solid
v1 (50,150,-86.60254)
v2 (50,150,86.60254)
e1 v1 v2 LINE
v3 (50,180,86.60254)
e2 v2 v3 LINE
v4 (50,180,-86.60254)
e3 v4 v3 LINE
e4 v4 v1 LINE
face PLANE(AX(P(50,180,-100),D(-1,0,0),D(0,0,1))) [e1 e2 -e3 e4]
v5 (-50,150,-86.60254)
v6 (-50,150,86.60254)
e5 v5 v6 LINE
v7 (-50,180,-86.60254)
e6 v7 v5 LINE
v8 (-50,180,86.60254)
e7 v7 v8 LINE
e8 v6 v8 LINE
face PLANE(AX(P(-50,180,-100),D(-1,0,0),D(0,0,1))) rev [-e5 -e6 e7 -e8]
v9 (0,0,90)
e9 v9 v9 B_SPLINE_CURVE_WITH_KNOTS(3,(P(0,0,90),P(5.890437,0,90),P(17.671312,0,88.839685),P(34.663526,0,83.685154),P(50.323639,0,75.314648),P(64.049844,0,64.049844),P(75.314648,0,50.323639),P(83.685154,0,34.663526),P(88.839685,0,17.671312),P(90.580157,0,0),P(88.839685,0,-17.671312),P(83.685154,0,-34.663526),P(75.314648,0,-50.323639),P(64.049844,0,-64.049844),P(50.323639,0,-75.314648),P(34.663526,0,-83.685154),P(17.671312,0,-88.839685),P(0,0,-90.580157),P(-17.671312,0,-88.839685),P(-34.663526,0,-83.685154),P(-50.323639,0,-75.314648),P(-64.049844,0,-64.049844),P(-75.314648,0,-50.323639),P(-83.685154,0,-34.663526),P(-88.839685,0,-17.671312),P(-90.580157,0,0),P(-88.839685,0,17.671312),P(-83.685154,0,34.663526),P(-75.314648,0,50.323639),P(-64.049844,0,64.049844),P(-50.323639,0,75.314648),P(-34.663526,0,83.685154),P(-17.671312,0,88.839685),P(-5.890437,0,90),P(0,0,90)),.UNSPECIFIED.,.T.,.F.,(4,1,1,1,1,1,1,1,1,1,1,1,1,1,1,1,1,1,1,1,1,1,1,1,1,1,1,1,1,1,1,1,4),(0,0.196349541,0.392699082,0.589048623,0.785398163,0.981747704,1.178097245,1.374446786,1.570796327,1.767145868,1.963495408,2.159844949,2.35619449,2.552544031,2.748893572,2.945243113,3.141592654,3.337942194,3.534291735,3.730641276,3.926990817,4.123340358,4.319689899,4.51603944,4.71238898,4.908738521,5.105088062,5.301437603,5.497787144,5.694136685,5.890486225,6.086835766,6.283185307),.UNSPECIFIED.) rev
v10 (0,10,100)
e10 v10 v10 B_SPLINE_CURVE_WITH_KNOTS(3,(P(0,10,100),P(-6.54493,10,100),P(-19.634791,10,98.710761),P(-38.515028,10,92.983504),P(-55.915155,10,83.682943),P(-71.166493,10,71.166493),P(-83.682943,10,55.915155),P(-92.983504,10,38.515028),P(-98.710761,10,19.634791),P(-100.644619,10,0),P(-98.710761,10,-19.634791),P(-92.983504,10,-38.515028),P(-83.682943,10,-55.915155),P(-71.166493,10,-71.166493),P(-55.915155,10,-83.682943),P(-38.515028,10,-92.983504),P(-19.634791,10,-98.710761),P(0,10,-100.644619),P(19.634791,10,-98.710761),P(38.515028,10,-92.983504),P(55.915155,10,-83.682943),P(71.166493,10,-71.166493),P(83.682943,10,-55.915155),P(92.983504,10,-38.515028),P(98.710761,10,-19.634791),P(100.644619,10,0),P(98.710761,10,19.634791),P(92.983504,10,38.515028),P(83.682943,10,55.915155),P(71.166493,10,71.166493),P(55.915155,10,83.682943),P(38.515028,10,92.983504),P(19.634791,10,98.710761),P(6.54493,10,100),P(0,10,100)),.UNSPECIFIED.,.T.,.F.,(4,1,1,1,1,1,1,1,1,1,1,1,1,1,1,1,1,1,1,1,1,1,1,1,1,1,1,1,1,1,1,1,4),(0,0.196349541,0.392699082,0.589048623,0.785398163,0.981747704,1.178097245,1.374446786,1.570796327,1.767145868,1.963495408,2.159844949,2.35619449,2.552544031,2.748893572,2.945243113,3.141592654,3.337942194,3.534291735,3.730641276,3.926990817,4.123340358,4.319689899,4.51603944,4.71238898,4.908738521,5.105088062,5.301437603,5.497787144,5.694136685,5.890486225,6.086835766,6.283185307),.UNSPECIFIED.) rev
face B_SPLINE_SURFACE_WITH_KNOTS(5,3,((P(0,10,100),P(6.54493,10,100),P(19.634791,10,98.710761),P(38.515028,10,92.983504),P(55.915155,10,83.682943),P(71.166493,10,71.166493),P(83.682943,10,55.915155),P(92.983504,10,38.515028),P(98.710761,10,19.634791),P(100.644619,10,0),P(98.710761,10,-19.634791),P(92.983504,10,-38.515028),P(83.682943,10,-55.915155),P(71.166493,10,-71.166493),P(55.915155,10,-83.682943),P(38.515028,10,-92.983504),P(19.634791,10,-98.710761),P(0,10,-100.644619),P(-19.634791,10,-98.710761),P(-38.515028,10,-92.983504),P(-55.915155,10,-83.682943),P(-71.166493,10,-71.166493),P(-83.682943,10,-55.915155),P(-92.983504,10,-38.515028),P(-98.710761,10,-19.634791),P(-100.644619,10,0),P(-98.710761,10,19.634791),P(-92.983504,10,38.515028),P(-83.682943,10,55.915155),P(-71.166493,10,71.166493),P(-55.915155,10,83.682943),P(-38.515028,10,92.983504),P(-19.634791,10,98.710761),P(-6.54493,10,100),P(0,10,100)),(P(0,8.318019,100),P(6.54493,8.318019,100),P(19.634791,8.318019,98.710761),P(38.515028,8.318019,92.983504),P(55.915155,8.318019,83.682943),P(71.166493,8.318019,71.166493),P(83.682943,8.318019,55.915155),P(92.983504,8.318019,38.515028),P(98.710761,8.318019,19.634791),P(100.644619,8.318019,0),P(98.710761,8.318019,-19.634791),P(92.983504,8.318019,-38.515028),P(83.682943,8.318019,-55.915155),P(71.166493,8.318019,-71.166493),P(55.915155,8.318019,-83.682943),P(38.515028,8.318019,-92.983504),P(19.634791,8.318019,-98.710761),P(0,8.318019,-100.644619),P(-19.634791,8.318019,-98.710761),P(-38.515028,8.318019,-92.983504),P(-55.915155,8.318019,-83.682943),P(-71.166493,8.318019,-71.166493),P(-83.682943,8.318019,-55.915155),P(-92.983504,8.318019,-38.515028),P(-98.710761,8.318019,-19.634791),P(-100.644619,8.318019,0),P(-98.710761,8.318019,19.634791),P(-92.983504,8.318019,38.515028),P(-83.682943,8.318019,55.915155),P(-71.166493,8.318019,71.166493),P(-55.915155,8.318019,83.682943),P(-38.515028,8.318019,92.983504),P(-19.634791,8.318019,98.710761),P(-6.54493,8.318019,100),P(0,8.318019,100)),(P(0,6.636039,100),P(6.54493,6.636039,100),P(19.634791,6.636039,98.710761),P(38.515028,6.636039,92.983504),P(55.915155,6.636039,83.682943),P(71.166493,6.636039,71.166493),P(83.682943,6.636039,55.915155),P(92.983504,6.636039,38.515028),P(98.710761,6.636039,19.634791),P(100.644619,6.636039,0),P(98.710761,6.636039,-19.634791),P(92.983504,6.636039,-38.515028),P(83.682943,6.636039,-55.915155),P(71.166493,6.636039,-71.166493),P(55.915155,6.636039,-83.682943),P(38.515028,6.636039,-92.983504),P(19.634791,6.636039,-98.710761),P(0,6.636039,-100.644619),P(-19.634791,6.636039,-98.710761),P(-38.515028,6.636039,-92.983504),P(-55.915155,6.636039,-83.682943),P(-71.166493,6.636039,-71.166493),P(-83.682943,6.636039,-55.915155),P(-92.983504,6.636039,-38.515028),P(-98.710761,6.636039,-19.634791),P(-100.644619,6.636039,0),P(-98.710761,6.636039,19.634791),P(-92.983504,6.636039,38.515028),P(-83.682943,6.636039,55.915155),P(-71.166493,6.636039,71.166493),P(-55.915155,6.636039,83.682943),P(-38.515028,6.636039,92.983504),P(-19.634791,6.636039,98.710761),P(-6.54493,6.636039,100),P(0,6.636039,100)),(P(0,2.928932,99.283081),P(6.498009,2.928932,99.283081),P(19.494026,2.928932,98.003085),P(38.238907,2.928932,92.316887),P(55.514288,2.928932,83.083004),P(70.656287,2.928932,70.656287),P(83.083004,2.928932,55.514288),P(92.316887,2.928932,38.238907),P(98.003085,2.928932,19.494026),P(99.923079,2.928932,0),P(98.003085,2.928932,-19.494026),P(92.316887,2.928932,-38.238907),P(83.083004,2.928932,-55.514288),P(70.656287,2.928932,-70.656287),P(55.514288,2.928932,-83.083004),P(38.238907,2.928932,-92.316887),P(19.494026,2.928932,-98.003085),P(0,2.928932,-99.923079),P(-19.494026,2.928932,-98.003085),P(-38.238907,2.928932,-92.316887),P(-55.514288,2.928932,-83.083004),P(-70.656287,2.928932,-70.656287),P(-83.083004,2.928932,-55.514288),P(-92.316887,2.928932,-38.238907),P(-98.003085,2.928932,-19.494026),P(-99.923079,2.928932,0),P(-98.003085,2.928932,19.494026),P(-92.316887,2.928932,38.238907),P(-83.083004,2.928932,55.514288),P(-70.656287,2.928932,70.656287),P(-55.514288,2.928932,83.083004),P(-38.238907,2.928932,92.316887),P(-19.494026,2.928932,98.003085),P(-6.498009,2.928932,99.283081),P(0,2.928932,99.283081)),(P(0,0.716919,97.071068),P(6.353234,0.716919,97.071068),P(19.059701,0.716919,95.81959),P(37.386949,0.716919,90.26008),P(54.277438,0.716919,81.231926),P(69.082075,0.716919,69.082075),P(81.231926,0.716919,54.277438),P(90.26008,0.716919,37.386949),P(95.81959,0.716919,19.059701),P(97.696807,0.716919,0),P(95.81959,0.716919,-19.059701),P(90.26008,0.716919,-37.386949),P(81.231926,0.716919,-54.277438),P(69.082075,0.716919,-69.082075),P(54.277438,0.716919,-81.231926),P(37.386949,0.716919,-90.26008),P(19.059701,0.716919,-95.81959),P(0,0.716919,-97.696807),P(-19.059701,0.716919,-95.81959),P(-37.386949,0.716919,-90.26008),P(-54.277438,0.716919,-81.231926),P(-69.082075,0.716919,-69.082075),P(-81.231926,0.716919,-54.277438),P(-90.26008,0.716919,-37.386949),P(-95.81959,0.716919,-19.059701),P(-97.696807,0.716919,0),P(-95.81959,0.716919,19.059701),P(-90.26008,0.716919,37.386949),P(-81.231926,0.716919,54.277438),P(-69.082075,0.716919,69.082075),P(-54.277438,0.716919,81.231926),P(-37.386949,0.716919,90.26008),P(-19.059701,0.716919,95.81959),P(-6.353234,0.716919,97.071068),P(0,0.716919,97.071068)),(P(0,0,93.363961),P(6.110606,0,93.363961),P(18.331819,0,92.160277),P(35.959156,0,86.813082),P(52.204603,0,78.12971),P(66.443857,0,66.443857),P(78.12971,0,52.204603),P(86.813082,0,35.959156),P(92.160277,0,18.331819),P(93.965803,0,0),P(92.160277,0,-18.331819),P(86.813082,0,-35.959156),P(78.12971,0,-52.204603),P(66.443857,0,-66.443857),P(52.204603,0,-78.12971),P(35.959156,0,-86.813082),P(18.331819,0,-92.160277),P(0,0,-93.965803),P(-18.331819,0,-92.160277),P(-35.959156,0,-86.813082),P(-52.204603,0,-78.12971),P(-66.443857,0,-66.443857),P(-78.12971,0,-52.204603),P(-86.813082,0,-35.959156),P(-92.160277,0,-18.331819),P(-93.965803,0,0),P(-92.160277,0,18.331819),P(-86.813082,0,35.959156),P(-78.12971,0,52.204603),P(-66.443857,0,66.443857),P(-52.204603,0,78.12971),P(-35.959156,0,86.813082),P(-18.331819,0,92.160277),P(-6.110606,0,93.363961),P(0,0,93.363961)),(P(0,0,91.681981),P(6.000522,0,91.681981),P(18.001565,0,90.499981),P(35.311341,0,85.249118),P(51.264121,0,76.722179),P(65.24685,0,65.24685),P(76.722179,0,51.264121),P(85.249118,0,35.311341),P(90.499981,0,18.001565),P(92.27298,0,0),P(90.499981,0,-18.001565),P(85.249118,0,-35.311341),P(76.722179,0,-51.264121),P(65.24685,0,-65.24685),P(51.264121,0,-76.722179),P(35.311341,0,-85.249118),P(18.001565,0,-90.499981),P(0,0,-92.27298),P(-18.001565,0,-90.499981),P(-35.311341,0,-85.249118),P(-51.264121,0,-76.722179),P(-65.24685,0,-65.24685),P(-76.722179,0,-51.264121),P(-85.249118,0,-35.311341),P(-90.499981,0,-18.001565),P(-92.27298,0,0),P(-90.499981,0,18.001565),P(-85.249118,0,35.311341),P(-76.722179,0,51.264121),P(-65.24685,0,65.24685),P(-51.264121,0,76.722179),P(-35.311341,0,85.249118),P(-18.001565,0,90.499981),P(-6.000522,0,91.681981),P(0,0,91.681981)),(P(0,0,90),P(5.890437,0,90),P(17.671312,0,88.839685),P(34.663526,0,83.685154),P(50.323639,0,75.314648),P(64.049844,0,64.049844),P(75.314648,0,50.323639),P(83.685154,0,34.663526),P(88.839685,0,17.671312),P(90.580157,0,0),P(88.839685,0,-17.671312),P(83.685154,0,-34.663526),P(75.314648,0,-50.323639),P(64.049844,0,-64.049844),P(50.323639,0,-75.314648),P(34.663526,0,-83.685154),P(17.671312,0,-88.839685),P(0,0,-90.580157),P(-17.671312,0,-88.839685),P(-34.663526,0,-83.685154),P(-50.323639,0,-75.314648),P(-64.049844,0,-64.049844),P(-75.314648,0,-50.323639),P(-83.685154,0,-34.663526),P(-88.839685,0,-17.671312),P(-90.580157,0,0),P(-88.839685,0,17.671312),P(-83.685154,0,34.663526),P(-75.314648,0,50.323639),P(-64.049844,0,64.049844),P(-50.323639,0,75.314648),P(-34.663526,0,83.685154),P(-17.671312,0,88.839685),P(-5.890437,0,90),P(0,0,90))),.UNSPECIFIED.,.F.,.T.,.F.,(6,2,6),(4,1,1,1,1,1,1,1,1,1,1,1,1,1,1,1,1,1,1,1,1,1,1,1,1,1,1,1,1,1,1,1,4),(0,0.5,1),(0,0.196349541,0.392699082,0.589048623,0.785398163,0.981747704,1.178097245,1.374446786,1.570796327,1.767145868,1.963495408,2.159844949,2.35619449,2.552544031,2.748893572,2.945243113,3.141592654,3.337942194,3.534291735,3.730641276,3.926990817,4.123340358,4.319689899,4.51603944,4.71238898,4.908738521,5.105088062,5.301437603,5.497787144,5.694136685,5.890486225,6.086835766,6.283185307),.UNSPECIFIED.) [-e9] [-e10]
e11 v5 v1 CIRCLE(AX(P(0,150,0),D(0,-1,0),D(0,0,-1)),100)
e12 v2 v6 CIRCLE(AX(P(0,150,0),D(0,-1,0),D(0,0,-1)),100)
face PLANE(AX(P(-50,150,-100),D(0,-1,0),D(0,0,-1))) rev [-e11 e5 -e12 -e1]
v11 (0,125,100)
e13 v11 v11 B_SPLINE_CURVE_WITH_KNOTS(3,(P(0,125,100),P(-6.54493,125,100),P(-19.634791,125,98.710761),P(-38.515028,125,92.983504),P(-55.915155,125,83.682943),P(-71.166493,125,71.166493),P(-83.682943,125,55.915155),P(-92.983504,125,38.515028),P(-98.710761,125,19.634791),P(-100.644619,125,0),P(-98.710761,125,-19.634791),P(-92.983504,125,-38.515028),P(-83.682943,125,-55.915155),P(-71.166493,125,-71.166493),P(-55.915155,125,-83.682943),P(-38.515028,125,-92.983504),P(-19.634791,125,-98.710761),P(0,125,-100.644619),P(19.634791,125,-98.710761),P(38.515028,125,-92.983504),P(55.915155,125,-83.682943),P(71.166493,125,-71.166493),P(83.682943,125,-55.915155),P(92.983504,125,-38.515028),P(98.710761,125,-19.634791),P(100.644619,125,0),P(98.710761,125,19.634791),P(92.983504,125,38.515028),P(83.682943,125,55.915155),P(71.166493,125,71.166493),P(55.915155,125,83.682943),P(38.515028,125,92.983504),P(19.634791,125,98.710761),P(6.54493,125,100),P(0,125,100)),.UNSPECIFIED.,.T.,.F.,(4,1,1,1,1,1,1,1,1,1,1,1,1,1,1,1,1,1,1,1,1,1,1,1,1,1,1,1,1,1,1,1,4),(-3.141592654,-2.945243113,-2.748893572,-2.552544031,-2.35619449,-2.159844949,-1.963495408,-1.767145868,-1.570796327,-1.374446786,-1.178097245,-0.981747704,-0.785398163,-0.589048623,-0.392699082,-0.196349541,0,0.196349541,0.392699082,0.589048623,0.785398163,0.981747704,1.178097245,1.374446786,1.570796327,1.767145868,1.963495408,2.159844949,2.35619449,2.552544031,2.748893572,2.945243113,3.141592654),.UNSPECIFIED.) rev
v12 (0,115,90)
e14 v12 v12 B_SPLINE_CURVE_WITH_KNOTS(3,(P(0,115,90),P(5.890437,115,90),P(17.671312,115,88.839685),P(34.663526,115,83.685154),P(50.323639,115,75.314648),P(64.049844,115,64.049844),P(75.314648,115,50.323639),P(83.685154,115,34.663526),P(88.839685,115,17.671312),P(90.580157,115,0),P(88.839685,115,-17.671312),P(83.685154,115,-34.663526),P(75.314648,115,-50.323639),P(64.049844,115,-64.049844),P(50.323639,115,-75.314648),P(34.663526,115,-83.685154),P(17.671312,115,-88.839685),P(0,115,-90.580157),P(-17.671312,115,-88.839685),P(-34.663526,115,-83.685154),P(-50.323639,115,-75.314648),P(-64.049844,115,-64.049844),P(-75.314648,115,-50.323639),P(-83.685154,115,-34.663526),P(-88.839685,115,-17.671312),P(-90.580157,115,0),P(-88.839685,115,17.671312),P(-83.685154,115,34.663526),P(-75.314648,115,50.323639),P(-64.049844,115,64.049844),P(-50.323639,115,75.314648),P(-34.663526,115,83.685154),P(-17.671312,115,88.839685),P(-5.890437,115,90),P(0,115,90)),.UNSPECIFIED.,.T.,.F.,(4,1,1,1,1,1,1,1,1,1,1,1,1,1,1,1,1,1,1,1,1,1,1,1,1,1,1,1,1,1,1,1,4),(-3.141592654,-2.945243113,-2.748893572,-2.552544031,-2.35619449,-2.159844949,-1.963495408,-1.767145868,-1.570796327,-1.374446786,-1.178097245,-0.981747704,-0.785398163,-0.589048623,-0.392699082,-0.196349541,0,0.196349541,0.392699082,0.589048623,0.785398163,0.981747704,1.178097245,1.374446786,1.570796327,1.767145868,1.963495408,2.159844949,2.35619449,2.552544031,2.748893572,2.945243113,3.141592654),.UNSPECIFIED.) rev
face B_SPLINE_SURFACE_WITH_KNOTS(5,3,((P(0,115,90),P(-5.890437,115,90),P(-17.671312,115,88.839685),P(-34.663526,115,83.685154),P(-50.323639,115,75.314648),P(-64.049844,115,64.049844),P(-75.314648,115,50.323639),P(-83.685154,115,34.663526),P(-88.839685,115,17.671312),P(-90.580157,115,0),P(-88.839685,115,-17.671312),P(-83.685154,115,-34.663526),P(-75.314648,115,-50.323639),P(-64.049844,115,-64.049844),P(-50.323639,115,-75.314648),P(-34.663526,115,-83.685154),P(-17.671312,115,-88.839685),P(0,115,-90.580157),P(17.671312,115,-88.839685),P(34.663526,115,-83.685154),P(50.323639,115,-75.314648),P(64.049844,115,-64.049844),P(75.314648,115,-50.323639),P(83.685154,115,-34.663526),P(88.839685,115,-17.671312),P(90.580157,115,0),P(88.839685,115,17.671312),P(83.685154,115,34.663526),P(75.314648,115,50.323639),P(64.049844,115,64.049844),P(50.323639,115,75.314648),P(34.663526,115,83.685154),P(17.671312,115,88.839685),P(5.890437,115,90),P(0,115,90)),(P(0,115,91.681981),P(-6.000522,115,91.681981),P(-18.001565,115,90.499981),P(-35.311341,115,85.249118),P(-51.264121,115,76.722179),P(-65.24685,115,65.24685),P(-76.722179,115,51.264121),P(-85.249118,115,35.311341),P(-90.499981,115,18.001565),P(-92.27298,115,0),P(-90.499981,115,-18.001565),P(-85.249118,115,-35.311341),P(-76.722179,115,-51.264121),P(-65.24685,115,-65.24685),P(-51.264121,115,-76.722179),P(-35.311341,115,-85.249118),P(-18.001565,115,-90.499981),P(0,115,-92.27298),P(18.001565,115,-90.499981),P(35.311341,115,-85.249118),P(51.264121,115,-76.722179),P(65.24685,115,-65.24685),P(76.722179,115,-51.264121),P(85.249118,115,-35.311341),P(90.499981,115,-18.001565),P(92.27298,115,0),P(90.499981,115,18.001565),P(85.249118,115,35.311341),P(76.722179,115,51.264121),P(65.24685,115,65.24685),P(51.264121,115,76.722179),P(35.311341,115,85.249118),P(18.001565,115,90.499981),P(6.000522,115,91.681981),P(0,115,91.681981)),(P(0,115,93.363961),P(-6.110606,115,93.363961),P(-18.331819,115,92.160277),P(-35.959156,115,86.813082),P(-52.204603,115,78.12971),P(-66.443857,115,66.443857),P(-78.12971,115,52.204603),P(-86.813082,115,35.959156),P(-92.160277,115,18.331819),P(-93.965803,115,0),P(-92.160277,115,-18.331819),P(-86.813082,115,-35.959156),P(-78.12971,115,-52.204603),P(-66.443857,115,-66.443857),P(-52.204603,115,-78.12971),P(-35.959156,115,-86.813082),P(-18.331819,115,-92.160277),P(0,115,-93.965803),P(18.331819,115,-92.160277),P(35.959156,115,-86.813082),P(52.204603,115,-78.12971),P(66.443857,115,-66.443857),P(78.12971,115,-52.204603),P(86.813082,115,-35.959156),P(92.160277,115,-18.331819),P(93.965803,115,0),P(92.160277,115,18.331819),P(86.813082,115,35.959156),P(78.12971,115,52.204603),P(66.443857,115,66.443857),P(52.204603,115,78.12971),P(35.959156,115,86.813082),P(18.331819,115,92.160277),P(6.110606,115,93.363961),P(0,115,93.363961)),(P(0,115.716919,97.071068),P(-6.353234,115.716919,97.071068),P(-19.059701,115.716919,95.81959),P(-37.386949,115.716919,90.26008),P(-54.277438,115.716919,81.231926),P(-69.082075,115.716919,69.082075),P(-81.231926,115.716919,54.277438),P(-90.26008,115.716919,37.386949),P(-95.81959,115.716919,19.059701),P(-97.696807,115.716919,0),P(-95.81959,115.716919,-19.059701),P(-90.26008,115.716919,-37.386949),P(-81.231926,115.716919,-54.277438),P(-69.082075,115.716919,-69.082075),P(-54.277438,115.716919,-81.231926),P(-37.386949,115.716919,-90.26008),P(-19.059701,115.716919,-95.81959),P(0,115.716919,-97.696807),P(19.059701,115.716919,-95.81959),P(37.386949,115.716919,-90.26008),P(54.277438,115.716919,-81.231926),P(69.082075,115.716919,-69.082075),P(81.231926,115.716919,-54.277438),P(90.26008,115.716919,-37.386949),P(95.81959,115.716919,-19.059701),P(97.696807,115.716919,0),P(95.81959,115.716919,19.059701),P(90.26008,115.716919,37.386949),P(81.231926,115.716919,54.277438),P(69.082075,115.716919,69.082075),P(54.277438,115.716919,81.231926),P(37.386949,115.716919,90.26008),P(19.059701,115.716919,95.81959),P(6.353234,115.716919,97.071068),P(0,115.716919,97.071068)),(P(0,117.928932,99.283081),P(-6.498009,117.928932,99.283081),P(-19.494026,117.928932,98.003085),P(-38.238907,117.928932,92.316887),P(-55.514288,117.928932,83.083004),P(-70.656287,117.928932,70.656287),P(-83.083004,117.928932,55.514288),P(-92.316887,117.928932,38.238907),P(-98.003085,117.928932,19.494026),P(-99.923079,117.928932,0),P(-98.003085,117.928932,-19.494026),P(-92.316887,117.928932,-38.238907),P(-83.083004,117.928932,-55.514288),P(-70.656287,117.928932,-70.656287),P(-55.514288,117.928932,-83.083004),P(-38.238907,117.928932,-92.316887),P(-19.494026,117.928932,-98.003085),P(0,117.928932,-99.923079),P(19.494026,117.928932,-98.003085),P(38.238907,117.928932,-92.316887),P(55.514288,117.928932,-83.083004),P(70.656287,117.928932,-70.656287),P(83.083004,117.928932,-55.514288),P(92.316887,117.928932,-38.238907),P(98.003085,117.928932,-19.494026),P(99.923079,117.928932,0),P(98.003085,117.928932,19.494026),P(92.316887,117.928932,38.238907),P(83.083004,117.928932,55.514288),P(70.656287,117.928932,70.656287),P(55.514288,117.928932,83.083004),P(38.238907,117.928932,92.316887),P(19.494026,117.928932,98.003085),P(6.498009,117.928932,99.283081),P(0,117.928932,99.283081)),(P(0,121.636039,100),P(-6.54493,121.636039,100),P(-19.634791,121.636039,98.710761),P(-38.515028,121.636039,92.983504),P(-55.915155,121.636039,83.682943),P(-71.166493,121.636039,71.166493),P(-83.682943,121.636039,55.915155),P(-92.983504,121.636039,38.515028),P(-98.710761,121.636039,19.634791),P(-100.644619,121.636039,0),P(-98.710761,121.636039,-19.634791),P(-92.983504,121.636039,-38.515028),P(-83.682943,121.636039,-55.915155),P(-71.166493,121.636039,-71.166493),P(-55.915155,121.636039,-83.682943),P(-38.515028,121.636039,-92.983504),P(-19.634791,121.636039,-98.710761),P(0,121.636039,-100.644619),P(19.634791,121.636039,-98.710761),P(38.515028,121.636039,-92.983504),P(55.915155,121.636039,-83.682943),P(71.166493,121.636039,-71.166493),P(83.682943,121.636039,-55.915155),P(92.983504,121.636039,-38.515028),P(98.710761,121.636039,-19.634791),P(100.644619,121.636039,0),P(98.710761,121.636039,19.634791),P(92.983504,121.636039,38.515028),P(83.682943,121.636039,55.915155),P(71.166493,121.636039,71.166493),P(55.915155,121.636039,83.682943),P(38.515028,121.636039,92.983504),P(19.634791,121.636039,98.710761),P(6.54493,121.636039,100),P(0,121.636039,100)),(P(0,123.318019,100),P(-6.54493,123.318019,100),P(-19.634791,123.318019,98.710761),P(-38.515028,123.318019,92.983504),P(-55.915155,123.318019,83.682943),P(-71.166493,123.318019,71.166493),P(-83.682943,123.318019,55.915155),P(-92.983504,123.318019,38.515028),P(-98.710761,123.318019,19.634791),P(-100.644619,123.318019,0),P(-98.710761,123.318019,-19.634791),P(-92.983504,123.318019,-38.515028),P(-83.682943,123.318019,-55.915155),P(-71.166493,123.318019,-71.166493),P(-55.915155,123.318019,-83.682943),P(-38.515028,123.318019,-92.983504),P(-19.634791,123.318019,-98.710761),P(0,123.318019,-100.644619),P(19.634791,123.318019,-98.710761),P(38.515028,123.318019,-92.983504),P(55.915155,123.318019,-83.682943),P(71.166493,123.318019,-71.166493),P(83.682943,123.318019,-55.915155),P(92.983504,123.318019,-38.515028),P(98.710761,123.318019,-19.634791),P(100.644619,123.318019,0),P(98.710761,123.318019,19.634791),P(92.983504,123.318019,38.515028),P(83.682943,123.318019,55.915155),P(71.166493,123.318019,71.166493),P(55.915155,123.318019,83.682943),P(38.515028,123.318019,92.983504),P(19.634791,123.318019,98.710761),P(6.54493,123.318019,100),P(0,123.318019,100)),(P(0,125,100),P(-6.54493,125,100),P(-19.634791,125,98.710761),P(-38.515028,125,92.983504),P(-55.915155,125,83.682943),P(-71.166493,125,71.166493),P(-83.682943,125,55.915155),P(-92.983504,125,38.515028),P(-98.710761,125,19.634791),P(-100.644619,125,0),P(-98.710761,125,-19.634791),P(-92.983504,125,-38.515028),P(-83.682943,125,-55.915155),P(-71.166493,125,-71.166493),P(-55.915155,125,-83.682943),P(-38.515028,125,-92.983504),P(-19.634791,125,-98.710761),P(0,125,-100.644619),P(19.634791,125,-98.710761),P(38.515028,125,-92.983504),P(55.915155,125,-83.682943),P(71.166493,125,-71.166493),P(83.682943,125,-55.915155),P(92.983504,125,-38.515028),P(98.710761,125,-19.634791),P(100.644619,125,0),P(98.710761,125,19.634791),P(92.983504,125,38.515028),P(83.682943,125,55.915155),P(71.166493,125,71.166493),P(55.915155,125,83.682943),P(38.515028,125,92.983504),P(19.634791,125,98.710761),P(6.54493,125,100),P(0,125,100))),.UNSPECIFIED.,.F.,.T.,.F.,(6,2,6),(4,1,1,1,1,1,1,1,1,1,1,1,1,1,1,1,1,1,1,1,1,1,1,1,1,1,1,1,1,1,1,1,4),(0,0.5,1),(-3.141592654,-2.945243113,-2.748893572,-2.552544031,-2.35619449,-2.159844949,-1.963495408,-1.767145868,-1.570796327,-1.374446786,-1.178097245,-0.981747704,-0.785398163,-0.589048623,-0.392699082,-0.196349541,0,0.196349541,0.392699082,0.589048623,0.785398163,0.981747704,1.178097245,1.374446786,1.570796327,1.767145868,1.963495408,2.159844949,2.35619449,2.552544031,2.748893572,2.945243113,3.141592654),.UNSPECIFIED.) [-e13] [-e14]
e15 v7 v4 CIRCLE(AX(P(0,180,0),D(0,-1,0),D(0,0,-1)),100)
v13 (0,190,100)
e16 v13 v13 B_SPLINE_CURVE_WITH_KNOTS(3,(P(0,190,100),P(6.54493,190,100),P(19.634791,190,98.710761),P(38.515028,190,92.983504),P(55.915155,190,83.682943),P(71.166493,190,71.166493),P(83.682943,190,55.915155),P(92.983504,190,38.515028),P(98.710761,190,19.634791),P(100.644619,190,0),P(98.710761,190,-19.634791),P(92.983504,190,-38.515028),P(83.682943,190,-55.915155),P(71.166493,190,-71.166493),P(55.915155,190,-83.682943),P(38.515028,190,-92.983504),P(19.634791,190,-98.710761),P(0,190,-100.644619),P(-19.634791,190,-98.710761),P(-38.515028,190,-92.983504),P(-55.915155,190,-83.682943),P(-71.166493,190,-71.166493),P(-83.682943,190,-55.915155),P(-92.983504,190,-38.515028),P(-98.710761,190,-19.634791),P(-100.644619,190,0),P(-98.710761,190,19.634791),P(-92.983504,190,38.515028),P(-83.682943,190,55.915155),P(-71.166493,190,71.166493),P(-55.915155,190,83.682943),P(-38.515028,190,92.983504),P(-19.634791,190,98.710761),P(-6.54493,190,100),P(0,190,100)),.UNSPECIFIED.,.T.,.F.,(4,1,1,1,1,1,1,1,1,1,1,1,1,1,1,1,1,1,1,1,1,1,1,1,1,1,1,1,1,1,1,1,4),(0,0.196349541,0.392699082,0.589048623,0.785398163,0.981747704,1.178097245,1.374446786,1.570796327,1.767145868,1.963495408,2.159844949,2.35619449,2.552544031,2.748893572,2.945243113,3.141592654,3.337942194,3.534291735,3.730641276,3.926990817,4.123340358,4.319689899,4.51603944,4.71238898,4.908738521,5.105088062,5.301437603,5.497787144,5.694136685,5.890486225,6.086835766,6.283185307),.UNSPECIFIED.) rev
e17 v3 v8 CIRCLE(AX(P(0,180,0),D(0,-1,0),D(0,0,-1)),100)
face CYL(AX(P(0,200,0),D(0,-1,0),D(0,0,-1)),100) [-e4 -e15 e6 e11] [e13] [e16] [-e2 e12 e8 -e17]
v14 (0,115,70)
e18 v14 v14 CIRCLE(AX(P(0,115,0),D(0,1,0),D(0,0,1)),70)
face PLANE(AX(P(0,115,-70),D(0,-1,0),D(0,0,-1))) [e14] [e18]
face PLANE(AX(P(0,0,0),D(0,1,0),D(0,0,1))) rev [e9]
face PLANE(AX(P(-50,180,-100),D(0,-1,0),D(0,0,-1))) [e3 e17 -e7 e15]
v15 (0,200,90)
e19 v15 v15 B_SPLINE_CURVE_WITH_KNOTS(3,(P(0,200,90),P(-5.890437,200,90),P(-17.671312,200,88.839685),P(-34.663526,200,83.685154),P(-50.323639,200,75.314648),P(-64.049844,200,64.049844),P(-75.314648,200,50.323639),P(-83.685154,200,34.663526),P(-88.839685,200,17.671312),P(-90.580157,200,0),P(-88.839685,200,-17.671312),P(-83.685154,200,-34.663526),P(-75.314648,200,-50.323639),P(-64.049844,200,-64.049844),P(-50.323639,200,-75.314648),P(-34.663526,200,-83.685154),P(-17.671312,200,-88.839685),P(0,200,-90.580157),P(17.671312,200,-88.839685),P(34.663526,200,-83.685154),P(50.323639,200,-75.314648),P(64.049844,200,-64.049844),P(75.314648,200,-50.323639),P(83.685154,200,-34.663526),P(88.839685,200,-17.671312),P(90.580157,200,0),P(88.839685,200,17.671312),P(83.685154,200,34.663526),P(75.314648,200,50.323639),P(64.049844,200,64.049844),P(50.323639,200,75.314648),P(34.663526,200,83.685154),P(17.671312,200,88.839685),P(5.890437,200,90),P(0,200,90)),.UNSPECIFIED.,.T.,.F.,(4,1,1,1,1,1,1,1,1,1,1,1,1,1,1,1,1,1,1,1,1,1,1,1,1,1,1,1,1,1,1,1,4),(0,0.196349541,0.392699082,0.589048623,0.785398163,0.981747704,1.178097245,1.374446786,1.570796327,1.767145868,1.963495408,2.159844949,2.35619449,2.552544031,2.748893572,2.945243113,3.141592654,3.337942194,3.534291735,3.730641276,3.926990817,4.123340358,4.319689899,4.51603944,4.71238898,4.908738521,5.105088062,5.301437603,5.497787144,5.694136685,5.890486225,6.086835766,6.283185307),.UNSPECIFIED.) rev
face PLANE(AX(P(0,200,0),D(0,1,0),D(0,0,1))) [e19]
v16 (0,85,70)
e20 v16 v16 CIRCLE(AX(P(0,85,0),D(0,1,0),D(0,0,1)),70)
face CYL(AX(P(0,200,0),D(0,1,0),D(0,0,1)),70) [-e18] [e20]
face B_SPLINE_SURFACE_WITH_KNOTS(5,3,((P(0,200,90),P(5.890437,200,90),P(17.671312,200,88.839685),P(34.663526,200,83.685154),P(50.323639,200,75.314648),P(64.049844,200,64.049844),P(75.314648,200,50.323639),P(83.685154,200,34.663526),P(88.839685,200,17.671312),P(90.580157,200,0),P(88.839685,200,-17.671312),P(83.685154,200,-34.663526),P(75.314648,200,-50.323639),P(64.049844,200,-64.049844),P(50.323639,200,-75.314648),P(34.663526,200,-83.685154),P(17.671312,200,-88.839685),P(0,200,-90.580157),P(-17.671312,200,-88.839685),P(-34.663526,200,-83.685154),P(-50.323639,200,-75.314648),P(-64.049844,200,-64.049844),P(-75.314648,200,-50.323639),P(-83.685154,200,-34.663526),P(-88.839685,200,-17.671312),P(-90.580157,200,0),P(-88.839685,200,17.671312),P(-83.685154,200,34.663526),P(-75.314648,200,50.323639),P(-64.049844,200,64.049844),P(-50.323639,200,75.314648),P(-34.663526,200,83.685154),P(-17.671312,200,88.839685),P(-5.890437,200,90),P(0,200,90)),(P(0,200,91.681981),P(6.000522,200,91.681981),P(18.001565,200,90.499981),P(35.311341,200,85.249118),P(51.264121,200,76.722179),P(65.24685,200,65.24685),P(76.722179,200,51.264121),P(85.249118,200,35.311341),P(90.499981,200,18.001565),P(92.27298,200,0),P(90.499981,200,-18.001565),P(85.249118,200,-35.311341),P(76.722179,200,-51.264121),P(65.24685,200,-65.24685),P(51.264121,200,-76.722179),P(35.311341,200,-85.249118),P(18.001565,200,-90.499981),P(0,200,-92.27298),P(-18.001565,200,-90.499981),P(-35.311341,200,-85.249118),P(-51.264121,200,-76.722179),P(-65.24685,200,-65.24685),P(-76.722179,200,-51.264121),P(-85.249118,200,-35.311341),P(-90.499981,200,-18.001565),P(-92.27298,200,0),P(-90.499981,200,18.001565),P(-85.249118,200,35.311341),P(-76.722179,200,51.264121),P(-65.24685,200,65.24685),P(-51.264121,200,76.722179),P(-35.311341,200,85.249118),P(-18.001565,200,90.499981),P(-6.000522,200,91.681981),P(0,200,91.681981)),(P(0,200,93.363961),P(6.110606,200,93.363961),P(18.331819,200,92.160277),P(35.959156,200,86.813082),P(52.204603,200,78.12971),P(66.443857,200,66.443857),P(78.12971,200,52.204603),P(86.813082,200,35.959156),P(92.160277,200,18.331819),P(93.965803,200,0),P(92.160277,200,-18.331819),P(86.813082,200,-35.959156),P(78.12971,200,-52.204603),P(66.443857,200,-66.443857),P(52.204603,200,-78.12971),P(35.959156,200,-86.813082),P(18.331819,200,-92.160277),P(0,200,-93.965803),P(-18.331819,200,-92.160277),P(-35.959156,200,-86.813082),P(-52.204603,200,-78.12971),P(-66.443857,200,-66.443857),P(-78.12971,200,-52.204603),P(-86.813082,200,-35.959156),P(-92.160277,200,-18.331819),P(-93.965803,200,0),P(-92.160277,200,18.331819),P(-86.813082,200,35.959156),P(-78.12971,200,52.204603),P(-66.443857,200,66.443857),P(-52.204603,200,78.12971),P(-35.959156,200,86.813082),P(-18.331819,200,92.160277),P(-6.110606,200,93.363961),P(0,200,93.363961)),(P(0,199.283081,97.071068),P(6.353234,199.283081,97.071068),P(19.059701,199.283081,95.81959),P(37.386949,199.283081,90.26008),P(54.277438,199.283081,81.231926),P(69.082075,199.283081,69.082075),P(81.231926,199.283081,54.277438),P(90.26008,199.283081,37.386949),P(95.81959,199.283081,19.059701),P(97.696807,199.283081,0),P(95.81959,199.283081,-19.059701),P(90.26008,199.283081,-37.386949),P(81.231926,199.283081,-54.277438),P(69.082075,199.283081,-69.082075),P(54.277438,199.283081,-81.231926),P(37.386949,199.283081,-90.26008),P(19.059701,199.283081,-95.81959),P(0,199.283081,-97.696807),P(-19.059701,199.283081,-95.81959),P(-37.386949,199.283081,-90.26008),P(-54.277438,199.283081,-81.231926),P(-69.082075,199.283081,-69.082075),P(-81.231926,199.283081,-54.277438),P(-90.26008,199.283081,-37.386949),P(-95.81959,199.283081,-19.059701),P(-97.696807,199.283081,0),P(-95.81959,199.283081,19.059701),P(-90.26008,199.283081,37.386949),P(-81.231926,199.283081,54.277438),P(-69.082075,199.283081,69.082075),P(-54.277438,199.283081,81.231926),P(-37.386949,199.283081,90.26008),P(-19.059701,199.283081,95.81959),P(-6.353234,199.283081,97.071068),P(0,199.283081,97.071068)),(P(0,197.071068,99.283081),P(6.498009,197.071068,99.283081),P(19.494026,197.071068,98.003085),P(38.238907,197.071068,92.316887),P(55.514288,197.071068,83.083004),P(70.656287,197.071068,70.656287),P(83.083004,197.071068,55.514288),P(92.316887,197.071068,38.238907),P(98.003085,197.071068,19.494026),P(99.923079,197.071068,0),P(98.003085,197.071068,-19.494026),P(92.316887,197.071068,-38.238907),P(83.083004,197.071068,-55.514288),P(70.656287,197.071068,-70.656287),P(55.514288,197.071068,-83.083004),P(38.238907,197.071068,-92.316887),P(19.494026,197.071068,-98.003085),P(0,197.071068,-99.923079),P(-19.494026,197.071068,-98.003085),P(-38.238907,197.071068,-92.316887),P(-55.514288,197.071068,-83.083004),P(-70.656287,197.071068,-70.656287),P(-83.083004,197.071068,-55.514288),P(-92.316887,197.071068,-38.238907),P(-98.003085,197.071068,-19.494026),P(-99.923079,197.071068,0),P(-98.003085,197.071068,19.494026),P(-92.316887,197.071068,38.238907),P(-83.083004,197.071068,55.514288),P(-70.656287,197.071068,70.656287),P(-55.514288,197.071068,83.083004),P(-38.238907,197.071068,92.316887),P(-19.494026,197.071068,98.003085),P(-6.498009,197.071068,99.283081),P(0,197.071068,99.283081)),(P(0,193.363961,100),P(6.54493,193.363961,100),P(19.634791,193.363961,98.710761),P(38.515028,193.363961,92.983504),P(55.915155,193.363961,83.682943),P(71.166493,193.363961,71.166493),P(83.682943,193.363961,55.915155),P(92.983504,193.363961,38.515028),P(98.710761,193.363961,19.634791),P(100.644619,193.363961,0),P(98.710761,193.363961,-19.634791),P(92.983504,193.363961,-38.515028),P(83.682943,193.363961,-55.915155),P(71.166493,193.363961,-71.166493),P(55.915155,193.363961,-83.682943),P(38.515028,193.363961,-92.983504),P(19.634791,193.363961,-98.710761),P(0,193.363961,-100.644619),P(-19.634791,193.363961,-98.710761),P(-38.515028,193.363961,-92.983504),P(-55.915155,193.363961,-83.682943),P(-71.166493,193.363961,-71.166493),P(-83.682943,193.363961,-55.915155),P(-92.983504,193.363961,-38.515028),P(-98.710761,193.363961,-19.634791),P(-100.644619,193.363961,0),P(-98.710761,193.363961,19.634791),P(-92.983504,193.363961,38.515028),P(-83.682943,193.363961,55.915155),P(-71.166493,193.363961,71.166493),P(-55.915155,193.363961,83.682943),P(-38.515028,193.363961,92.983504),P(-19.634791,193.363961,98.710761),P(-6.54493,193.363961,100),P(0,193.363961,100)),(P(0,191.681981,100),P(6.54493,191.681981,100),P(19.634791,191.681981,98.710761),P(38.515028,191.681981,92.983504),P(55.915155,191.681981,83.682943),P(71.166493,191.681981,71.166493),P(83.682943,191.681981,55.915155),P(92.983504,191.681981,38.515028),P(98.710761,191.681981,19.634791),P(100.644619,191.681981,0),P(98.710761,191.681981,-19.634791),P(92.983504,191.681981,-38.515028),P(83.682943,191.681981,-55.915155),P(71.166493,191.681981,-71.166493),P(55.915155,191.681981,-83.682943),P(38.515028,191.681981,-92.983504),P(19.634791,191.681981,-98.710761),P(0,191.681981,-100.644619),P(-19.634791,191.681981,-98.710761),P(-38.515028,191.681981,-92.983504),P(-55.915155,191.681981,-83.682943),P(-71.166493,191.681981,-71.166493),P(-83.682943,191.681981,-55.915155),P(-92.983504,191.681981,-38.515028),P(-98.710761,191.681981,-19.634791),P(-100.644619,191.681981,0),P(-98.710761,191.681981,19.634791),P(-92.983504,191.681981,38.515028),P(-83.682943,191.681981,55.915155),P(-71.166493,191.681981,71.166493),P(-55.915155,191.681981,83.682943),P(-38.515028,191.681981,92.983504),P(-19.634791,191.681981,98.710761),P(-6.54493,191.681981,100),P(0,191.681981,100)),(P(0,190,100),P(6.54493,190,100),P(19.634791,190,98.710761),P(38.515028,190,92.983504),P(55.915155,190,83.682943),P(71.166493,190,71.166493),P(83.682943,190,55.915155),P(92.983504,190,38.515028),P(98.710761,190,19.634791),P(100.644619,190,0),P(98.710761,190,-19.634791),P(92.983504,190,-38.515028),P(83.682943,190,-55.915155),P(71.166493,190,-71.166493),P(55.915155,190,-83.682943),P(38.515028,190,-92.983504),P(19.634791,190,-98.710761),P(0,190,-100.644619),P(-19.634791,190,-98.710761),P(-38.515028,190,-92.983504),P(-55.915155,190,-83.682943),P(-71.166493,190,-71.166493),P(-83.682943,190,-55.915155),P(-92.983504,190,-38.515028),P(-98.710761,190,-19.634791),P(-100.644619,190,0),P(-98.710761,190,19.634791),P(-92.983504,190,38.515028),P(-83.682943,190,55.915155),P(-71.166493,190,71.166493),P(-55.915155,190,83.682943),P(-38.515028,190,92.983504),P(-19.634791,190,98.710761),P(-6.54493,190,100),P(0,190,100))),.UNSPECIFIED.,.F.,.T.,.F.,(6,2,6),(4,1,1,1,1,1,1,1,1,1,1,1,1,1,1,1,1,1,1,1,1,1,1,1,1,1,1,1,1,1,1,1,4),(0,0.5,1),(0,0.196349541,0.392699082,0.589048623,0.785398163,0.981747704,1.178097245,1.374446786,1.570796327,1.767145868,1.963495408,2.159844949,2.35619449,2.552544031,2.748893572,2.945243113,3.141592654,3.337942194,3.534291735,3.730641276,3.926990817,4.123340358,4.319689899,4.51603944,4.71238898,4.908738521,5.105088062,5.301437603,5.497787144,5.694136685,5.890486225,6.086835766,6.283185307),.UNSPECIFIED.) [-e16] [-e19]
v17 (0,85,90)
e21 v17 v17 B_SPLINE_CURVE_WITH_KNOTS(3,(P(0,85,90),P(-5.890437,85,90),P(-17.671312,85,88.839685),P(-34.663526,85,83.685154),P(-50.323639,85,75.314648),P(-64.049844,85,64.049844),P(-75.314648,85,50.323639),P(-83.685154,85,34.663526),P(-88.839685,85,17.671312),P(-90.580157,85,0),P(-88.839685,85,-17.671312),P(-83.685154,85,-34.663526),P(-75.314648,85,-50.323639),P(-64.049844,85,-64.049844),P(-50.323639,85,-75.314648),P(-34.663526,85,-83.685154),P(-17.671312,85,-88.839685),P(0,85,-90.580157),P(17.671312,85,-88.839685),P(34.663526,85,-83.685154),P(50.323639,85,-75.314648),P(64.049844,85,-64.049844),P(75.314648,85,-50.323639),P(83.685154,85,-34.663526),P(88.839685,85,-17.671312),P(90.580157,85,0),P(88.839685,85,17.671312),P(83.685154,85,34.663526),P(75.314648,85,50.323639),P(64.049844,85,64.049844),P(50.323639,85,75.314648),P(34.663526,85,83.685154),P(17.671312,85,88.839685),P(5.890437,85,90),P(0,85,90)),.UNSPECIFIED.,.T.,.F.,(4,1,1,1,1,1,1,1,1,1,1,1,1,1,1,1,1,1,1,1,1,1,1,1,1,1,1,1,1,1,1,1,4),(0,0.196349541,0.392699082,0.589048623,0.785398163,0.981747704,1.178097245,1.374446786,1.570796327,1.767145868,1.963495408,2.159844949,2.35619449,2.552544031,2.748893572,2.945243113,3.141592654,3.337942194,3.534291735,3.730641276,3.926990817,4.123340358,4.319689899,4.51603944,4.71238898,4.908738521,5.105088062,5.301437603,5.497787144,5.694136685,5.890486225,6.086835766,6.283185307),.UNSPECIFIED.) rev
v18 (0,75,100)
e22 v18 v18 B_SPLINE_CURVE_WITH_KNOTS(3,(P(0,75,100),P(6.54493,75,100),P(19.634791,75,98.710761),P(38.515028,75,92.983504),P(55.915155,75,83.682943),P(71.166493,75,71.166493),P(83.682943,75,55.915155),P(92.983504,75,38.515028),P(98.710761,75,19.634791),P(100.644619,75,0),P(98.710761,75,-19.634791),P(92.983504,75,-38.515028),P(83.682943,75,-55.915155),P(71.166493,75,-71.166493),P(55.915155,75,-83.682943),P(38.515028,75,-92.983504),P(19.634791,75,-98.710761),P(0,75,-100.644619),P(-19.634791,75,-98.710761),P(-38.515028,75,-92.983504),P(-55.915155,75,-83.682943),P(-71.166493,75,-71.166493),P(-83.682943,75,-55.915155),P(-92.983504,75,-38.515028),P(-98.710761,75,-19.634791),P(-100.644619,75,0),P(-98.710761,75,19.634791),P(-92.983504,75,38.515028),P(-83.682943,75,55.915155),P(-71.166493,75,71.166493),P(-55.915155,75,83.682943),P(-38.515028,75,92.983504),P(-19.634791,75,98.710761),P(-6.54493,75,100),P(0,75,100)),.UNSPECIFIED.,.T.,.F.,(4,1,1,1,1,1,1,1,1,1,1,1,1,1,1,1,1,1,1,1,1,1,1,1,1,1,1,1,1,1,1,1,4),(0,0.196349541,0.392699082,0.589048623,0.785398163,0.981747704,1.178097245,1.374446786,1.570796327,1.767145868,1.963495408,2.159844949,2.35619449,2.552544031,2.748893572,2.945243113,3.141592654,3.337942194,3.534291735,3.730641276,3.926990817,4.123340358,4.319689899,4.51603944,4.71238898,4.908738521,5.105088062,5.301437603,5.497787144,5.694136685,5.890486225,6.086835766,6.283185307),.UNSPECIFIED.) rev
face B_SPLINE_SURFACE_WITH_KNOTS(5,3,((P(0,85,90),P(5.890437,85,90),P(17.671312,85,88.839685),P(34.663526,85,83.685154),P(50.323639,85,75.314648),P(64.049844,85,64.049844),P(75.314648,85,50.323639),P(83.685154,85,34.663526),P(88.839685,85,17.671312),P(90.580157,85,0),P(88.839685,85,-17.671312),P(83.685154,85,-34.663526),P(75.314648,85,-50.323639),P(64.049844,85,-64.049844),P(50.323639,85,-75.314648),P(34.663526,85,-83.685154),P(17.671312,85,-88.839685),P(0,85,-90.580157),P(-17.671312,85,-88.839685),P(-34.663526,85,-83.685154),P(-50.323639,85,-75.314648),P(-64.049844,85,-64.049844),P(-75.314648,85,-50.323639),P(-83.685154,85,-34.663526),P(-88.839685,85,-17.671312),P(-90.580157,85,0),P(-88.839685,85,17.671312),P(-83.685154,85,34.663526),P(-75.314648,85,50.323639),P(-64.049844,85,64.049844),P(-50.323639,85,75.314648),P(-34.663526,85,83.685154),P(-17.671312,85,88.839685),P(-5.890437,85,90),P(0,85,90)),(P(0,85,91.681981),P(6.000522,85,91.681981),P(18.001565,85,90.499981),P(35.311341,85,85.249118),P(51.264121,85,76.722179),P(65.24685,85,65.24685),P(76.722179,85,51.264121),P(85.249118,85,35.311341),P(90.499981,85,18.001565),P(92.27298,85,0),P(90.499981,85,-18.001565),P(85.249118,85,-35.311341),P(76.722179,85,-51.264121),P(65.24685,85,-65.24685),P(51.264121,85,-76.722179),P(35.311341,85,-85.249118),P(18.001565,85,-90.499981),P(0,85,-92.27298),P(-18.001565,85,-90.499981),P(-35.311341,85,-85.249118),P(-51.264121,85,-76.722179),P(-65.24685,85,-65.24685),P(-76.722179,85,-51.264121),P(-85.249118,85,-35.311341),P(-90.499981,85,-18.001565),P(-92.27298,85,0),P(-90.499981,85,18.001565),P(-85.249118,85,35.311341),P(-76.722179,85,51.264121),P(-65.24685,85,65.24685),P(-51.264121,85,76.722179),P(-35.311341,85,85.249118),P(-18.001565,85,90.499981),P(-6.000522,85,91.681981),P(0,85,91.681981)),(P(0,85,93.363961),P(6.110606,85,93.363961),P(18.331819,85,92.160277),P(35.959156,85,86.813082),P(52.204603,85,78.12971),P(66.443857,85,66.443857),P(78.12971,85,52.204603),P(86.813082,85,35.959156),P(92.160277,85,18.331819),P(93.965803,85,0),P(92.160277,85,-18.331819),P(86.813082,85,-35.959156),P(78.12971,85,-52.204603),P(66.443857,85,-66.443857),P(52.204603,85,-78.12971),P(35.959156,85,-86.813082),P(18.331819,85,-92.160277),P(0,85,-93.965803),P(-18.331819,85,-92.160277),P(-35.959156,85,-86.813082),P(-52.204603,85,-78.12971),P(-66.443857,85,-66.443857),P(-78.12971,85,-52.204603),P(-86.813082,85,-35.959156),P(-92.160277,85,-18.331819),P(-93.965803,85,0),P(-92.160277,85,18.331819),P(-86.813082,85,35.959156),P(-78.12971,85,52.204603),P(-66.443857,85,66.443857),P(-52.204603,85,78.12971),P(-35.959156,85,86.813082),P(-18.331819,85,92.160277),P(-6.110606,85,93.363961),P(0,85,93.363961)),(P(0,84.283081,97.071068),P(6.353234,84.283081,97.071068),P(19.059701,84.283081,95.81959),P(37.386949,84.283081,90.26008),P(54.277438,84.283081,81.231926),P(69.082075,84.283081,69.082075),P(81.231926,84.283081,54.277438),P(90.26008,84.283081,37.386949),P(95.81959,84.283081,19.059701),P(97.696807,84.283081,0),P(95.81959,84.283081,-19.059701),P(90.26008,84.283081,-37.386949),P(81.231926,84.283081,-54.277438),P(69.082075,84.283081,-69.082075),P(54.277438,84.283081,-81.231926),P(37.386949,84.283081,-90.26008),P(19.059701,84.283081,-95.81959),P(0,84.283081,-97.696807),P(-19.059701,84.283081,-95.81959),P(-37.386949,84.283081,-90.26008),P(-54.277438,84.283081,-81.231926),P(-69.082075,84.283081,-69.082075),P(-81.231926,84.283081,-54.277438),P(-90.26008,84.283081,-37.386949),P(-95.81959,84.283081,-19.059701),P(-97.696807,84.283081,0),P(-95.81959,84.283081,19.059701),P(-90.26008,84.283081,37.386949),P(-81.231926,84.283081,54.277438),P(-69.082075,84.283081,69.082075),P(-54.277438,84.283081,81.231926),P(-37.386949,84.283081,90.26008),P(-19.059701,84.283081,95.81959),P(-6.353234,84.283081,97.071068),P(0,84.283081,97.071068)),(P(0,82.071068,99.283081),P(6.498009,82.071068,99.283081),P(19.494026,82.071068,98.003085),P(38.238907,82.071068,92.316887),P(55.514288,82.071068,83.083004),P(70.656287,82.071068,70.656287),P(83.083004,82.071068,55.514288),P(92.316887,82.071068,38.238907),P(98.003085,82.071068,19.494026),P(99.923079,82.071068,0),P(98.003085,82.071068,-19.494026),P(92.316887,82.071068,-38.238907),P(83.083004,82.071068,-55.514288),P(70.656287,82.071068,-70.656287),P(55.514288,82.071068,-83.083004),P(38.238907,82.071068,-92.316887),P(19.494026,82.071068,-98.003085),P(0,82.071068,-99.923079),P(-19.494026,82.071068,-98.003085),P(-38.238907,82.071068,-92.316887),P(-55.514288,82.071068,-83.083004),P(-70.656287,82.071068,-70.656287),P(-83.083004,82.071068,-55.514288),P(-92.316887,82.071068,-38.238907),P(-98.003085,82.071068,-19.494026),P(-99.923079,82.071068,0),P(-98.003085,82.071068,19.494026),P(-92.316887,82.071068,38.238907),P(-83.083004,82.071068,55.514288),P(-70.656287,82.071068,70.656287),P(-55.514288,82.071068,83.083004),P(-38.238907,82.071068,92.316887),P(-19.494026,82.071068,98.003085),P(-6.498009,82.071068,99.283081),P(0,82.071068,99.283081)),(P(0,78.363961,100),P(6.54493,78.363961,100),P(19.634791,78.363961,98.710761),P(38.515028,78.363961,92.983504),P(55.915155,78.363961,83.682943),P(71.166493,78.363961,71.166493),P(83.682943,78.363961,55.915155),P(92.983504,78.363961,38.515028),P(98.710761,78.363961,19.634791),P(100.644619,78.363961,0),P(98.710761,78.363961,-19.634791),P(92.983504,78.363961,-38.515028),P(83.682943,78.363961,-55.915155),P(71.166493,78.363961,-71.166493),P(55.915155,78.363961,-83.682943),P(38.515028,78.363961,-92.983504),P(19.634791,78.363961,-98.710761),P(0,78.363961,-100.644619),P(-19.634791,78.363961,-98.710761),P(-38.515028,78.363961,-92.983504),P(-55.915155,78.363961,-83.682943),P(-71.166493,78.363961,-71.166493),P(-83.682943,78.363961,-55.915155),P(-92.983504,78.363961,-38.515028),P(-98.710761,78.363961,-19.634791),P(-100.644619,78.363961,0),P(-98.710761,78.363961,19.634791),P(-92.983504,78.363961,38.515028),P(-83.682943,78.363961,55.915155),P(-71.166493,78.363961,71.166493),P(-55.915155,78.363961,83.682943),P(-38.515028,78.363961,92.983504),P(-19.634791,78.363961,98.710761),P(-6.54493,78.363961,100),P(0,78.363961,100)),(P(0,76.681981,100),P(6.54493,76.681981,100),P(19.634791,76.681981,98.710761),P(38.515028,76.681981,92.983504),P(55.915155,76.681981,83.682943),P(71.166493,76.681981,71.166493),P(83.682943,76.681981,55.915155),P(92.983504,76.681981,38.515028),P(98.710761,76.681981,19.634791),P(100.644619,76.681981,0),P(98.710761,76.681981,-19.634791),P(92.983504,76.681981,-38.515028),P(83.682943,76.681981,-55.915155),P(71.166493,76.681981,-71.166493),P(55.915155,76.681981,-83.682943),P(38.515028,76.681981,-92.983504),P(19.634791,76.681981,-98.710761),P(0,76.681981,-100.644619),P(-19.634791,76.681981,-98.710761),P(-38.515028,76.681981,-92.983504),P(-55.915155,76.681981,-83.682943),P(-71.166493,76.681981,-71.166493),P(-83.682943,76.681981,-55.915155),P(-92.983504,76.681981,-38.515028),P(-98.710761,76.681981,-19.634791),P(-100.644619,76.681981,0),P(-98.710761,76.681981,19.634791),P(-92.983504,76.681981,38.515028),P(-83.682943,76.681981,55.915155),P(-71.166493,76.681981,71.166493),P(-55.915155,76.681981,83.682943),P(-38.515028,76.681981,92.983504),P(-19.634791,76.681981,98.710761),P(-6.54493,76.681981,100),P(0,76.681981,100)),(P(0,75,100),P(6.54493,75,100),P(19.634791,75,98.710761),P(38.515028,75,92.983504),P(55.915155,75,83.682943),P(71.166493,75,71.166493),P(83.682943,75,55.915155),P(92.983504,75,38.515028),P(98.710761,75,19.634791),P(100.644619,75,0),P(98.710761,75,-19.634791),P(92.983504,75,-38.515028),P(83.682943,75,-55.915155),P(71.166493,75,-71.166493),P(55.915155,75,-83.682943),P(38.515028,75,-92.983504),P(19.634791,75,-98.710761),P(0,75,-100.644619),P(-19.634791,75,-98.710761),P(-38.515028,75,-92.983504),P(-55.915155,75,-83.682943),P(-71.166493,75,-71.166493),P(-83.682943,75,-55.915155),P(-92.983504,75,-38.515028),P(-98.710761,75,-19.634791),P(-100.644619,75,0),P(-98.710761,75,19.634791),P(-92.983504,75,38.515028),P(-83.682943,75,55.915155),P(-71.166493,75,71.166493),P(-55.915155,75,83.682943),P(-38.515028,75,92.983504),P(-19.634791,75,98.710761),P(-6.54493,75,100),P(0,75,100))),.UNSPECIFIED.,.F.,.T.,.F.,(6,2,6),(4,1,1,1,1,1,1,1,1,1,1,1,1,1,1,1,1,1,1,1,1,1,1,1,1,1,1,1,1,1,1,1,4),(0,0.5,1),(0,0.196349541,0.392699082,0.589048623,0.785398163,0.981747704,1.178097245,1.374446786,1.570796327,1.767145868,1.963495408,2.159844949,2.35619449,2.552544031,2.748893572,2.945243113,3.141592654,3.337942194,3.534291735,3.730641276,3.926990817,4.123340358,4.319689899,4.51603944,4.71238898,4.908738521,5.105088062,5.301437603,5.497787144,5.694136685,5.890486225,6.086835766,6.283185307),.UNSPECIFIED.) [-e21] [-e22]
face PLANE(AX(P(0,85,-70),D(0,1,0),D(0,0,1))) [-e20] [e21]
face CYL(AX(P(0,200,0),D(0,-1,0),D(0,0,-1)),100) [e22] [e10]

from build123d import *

# Parameters (mm, degrees)
SKETCH2_R               = 100
BOSS_EXTRUDE1_DEPTH     = 200
SKETCH3_W               = 30
SKETCH3_H               = 30
CUT_EXTRUDE1_DEPTH      = 245.948974278
CUT_EXTRUDE1_DEPTH_BACK = 245.948974278
SKETCH4_W               = 100
SKETCH4_H               = 30
FILLET2_SIZE            = 10


with BuildPart() as part:
    # Sketch2 → Boss-Extrude1 (new body)
    with BuildSketch(Plane(origin=(0, 0, 0), x_dir=(1, 0, 0), z_dir=(0, 1, 0))):
        with Locations(Location((0, 0, 0), (0, 0, 270))):
            Circle(SKETCH2_R)
    extrude(amount=BOSS_EXTRUDE1_DEPTH)

    # Sketch3 → Cut-Revolve1 (revolve, cut)
    with BuildSketch(Plane(origin=(0, 0, 0), x_dir=(0, 0, -1), z_dir=(1, 0, 0)), mode=Mode.PRIVATE) as cut_revolve1_sk:
        with Locations((85, 100)):
            Rectangle(SKETCH3_W, SKETCH3_H)
    revolve(cut_revolve1_sk.sketch.rotate(Axis((0, 200, 0), (0, -1, 0)), 180), axis=Axis((0, 200, 0), (0, -1, 0)), mode=Mode.SUBTRACT)

    # Sketch4 → Cut-Extrude1 (cut, two sides: drawn at the far end of the back side and taken through both)
    with BuildSketch(Plane.XY.offset(-CUT_EXTRUDE1_DEPTH_BACK)):
        with Locations((0, 165)):
            Rectangle(SKETCH4_W, SKETCH4_H)
    extrude(amount=CUT_EXTRUDE1_DEPTH + CUT_EXTRUDE1_DEPTH_BACK, mode=Mode.SUBTRACT)

    # Fillet2
    # a fillet whose section is not a circle: 10 mm, written as the material it takes off along each edge
    with BuildSketch(Plane(origin=(0, 0, 0), x_dir=(0, 0, 1), z_dir=(-1, 0, 0))) as fillet2_piece_1:
        with BuildLine():
            add(Edge.make_bspline([(100, FILLET2_SIZE), (100, FILLET2_SIZE * 0.831801948466), (100, FILLET2_SIZE * 0.663603896932), (100 - FILLET2_SIZE * 0.0716919198361, FILLET2_SIZE * 0.292893218813), (100 - FILLET2_SIZE * 0.292893218813, FILLET2_SIZE * 0.0716919198361), (100 - FILLET2_SIZE * 0.663603896932, 0), (100 - FILLET2_SIZE * 0.831801948466, 0), (100 - FILLET2_SIZE, 0)], knots=[0, 0, 0, 0, 0, 0, 0.5, 0.5, 1, 1, 1, 1, 1, 1], degree=5))
            Line((100 - FILLET2_SIZE, 0), (100, 0))
            Line((100, 0), (100, FILLET2_SIZE))
        make_face()
    revolve(axis=Axis((0, 0, 0), (0, 1, 0)), mode=Mode.SUBTRACT)
    with BuildSketch(Plane(origin=(0, 200, 0), x_dir=(0, 0, 1), z_dir=(-1, 0, 0))) as fillet2_piece_2:
        with BuildLine():
            add(Edge.make_bspline([(100, -FILLET2_SIZE), (100, -FILLET2_SIZE * 0.831801948466), (100, -FILLET2_SIZE * 0.663603896932), (100 - FILLET2_SIZE * 0.0716919198361, -FILLET2_SIZE * 0.292893218813), (100 - FILLET2_SIZE * 0.292893218813, -FILLET2_SIZE * 0.0716919198361), (100 - FILLET2_SIZE * 0.663603896932, 0), (100 - FILLET2_SIZE * 0.831801948466, 0), (100 - FILLET2_SIZE, 0)], knots=[0, 0, 0, 0, 0, 0, 0.5, 0.5, 1, 1, 1, 1, 1, 1], degree=5))
            Line((100 - FILLET2_SIZE, 0), (100, 0))
            Line((100, 0), (100, -FILLET2_SIZE))
        make_face()
    revolve(axis=Axis((0, 200, 0), (0, 1, 0)), mode=Mode.SUBTRACT)
    with BuildSketch(Plane(origin=(0, 85, 0), x_dir=(0, 0, 1), z_dir=(1, 0, 0))) as fillet2_piece_3:
        with BuildLine():
            add(Edge.make_bspline([(100, FILLET2_SIZE), (100, FILLET2_SIZE * 0.831801948466), (100, FILLET2_SIZE * 0.663603896932), (100 - FILLET2_SIZE * 0.0716919198361, FILLET2_SIZE * 0.292893218813), (100 - FILLET2_SIZE * 0.292893218813, FILLET2_SIZE * 0.0716919198361), (100 - FILLET2_SIZE * 0.663603896932, 0), (100 - FILLET2_SIZE * 0.831801948466, 0), (100 - FILLET2_SIZE, 0)], knots=[0, 0, 0, 0, 0, 0, 0.5, 0.5, 1, 1, 1, 1, 1, 1], degree=5))
            Line((100 - FILLET2_SIZE, 0), (100, 0))
            Line((100, 0), (100, FILLET2_SIZE))
        make_face()
    revolve(axis=Axis((0, 85, 0), (0, -1, 0)), mode=Mode.SUBTRACT)
    with BuildSketch(Plane(origin=(0, 115, 0), x_dir=(0, 0, 1), z_dir=(1, 0, 0))) as fillet2_piece_4:
        with BuildLine():
            add(Edge.make_bspline([(100 - FILLET2_SIZE, 0), (100 - FILLET2_SIZE * 0.831801948466, 0), (100 - FILLET2_SIZE * 0.663603896932, 0), (100 - FILLET2_SIZE * 0.292893218813, -FILLET2_SIZE * 0.0716919198361), (100 - FILLET2_SIZE * 0.0716919198361, -FILLET2_SIZE * 0.292893218813), (100, -FILLET2_SIZE * 0.663603896932), (100, -FILLET2_SIZE * 0.831801948466), (100, -FILLET2_SIZE)], knots=[0, 0, 0, 0, 0, 0, 0.5, 0.5, 1, 1, 1, 1, 1, 1], degree=5))
            Line((100, -FILLET2_SIZE), (100, 0))
            Line((100, 0), (100 - FILLET2_SIZE, 0))
        make_face()
    revolve(axis=Axis((0, 115, 0), (0, -1, 0)), mode=Mode.SUBTRACT)


solid = part.part
